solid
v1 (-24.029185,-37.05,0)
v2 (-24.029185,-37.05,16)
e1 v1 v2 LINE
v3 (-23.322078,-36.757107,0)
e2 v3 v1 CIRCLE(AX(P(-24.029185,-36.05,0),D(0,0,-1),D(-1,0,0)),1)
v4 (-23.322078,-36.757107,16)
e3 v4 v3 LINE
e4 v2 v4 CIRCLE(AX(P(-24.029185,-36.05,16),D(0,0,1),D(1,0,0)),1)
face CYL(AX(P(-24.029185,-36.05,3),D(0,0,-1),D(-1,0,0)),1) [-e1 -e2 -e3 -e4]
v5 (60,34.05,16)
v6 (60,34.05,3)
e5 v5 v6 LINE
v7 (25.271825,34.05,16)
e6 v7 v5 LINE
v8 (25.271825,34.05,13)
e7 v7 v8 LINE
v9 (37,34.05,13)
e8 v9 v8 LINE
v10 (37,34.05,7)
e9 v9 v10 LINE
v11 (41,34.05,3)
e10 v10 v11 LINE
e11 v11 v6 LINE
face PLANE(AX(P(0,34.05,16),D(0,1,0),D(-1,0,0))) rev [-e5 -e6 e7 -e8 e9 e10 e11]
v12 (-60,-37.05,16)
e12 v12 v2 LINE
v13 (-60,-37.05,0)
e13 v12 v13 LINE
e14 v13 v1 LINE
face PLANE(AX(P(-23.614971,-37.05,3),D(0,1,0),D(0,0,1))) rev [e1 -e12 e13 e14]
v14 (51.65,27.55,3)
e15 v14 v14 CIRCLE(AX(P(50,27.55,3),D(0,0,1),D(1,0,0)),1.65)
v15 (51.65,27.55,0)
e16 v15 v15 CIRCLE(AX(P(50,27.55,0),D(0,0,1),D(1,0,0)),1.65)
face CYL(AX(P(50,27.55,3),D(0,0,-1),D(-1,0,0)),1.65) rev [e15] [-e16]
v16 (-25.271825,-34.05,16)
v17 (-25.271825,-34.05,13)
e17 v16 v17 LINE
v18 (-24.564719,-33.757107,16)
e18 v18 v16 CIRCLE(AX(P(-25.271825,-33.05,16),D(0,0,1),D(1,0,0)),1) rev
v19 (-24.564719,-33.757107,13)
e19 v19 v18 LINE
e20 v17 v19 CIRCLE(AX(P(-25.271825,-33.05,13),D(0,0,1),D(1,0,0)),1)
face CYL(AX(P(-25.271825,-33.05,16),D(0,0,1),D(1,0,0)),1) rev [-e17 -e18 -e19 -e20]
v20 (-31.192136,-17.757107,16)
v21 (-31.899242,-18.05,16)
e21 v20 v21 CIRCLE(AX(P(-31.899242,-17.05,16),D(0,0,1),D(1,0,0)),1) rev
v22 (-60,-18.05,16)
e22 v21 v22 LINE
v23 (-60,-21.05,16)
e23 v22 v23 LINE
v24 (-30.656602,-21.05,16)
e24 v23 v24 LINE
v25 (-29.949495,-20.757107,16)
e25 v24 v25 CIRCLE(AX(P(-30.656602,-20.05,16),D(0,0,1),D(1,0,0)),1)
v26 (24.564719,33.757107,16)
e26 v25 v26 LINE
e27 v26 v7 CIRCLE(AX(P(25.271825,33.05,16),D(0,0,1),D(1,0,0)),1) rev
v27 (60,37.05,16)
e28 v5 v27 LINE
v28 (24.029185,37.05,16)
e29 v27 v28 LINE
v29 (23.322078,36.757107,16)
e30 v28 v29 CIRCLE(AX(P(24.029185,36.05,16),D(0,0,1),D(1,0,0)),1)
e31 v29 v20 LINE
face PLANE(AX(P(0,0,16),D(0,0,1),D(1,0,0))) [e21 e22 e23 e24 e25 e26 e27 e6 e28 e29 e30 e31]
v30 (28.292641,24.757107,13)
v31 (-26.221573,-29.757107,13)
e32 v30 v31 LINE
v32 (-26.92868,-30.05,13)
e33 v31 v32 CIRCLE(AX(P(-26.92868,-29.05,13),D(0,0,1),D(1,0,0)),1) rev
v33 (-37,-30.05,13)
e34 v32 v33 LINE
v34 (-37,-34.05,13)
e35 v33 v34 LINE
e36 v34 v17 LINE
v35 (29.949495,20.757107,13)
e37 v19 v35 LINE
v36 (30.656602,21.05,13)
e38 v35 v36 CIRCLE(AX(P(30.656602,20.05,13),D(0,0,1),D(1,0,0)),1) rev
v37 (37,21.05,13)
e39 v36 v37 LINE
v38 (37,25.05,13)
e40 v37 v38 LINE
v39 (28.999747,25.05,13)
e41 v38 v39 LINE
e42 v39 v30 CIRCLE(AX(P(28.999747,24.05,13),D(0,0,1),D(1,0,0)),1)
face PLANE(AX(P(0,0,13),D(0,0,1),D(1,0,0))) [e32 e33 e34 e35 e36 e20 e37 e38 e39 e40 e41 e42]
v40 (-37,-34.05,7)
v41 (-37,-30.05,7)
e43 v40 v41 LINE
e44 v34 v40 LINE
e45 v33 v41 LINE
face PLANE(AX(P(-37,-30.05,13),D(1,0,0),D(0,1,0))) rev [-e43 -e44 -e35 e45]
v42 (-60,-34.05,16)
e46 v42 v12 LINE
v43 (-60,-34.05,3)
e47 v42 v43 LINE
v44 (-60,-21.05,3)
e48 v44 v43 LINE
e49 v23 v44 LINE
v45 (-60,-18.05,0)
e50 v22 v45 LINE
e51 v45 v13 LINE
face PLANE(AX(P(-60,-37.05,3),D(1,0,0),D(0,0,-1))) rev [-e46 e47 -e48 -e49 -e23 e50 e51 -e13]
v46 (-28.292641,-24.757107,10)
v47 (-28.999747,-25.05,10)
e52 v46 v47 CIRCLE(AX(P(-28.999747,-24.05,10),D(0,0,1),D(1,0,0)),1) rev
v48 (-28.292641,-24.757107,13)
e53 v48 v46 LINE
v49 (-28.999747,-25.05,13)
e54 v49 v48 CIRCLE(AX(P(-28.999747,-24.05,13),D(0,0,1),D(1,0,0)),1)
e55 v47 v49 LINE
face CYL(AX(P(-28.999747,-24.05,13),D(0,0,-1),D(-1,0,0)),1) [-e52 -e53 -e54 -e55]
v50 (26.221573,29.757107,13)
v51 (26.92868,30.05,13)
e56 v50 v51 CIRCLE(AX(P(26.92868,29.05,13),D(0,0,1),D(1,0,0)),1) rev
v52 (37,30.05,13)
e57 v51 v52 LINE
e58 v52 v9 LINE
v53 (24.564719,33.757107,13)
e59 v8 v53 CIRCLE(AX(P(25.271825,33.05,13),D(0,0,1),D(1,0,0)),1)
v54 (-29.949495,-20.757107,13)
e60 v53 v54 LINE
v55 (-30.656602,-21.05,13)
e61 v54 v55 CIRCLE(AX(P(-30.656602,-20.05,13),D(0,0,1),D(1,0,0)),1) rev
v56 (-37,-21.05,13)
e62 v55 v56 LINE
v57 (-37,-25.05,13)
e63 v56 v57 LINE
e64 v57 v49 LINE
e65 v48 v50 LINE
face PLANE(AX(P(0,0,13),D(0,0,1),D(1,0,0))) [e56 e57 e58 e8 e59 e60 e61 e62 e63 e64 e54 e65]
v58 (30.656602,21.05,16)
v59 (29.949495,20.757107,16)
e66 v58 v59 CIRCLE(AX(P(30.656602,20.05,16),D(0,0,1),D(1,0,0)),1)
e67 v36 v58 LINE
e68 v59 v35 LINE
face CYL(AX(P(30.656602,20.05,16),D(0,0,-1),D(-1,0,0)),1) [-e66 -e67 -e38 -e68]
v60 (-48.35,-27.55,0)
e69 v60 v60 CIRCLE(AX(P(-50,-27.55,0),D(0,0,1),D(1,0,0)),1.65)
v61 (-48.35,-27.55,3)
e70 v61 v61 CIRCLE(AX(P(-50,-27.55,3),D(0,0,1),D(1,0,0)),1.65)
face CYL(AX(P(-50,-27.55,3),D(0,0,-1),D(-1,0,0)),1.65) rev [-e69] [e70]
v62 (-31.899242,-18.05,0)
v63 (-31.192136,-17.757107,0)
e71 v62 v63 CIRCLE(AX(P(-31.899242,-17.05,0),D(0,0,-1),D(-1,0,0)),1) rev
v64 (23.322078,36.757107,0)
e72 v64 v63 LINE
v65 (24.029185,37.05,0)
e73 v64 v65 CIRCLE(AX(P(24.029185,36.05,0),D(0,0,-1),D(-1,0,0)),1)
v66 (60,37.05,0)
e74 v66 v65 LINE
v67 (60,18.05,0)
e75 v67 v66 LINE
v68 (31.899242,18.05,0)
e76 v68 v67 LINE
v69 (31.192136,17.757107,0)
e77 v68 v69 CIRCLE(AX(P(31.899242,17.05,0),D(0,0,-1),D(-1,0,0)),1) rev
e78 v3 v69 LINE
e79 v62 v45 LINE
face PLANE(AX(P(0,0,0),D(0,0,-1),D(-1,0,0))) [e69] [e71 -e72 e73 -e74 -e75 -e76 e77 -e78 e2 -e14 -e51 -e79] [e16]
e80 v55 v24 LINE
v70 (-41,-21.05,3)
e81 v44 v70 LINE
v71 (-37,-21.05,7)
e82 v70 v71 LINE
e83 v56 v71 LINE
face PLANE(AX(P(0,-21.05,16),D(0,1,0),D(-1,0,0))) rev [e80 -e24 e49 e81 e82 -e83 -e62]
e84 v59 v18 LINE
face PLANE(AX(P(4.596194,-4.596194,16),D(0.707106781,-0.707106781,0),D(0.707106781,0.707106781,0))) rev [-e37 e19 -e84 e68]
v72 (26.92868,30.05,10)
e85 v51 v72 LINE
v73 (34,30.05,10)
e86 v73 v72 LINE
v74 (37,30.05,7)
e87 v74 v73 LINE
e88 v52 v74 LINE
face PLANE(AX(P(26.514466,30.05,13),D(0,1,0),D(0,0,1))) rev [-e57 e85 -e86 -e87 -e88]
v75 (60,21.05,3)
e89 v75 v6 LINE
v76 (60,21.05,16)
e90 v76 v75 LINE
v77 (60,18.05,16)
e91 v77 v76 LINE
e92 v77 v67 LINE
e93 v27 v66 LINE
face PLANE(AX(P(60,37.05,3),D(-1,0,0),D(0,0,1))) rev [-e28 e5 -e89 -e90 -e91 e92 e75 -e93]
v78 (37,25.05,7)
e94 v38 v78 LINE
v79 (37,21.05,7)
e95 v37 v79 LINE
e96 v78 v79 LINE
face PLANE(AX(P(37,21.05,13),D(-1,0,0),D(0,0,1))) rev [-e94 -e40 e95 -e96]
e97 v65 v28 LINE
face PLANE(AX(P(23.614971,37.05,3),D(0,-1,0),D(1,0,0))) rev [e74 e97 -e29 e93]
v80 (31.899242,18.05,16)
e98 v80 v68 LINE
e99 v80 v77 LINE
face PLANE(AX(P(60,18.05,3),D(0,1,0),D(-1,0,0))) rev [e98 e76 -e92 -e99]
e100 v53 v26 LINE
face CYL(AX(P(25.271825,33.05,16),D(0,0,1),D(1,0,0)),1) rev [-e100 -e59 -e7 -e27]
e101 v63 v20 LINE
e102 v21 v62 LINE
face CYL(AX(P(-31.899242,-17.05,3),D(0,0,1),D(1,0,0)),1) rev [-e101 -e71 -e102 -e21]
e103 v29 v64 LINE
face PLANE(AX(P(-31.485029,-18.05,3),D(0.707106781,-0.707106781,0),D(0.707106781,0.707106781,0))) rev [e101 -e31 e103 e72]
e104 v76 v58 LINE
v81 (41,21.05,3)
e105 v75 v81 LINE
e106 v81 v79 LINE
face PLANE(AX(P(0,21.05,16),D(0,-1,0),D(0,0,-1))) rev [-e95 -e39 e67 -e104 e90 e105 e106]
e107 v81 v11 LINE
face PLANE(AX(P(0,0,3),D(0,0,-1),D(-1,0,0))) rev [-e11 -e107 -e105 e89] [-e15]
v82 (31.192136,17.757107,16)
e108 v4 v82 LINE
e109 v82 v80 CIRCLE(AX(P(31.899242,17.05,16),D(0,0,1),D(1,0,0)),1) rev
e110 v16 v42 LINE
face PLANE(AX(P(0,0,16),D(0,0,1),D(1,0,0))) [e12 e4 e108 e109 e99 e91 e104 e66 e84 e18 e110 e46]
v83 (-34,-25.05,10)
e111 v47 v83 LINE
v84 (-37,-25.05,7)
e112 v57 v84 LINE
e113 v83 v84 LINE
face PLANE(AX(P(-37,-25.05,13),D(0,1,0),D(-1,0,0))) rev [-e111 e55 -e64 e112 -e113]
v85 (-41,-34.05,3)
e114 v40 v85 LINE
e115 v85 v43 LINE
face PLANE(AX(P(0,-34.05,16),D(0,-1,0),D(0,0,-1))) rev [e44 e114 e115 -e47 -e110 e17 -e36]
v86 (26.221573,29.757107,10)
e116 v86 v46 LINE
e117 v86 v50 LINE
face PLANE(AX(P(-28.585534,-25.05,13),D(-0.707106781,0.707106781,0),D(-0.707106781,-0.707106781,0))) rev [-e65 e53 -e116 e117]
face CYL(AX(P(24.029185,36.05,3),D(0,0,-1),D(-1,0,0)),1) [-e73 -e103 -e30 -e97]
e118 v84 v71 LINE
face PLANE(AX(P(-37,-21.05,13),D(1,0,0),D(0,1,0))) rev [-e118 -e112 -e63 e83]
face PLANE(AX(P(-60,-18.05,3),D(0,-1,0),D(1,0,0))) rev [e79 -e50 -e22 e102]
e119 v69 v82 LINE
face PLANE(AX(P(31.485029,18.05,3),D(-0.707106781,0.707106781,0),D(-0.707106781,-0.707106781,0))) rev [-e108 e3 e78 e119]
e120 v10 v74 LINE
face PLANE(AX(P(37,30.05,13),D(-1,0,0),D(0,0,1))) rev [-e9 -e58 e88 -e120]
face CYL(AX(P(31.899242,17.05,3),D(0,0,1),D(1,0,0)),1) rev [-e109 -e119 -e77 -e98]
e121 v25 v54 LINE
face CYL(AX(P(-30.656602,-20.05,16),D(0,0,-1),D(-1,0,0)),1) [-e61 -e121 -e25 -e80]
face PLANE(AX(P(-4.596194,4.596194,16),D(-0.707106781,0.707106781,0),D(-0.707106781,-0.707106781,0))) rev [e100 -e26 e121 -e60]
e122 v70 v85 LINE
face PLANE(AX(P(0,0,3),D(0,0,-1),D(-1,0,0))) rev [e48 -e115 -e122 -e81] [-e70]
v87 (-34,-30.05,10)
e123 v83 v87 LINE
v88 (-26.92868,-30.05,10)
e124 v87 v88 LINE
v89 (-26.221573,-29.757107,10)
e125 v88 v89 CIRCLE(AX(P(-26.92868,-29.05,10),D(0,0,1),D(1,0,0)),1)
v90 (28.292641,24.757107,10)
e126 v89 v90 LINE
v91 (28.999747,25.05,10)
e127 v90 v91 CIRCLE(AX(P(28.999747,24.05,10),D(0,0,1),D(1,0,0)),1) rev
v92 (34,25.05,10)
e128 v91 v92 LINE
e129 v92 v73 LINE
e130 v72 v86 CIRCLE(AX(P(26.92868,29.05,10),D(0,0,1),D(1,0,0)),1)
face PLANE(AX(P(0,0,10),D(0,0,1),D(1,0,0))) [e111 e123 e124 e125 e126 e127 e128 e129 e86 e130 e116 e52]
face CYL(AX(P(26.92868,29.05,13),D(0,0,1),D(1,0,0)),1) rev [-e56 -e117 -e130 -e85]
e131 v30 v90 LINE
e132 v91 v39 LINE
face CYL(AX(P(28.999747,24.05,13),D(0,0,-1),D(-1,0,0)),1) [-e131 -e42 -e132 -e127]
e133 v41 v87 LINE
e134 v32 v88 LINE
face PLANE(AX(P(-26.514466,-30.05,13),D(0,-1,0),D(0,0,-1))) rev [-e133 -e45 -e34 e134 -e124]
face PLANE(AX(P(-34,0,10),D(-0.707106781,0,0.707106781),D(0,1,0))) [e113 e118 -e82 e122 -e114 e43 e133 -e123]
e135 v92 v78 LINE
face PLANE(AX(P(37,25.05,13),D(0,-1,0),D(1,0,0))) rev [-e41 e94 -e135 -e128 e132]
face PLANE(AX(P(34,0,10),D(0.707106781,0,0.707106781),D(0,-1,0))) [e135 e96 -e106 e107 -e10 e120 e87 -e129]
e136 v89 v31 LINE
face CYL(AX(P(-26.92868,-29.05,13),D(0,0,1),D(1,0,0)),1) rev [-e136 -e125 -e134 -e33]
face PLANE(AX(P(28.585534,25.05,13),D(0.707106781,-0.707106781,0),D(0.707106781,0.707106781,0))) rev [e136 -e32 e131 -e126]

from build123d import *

# Parameters (mm, degrees)
SKETCH_10_R     = 1.65
EXTRUDE_1_DEPTH = 3
EXTRUDE_START   = 3
EXTRUDE_2_DEPTH = 7
EXTRUDE_3_DEPTH = 13
CHAMFER_1_SIZE  = 7
EXTRUDE_5_DEPTH = 10
FILLET_1_R      = 1


with BuildPart() as part:
    # 草图10 → 凸台-拉伸1 (new body)
    with BuildSketch(Plane.XY):
        Polygon((-60, -18.05), (-31.485028843, -18.05), (23.614971157, 37.05), (60, 37.05), (60, 18.05), (31.485028843, 18.05), (-23.614971157, -37.05), (-60, -37.05), align=None)
        with Locations((-50, -27.55)):
            Circle(SKETCH_10_R, mode=Mode.SUBTRACT)
        with Locations((50, 27.55)):
            Circle(SKETCH_10_R, mode=Mode.SUBTRACT)
    extrude(amount=EXTRUDE_1_DEPTH)

    # 草图11 → 凸台-拉伸2 (add)
    with BuildSketch(Plane.XY.offset(EXTRUDE_START)):
        Polygon((-41, -18.05), (-41, -37.05), (-23.614971157, -37.05), (31.485028843, 18.05), (41, 18.05), (41, 37.05), (23.614971157, 37.05), (-31.485028843, -18.05), align=None)
    extrude(amount=EXTRUDE_2_DEPTH)

    # 草图12 → 凸台-拉伸3 (add)
    with BuildSketch(Plane.XY.offset(EXTRUDE_START)):
        Polygon((-60, -18.05), (-31.485028843, -18.05), (23.614971157, 37.05), (60, 37.05), (60, 34.05), (24.857611845, 34.05), (-30.242388155, -21.05), (-60, -21.05), align=None)
        Polygon((-60, -34.05), (-60, -37.05), (-23.614971157, -37.05), (31.485028843, 18.05), (60, 18.05), (60, 21.05), (30.242388155, 21.05), (-24.857611845, -34.05), align=None)
    extrude(amount=EXTRUDE_3_DEPTH)

    # 倒角1
    chamfer_1_edges = [part.edges().sort_by_distance(p)[0] for p in [
        (41, 27.55, 10),
        (-41, -27.55, 10),
    ]]
    chamfer(chamfer_1_edges, length=CHAMFER_1_SIZE - 0.0001)  # a hair under: the kernel refuses the full size

    # 草图15 → 凸台-拉伸5 (add)
    with BuildSketch(Plane.XY.offset(3)):
        Polygon((-37, -21.05), (-37, -25.05), (-28.585533906, -25.05), (26.514466094, 30.05), (37, 30.05), (37, 34.05), (24.857611845, 34.05), (-30.242388155, -21.05), align=None)
        Polygon((-37, -30.05), (-37, -34.05), (-24.857611845, -34.05), (30.242388155, 21.05), (37, 21.05), (37, 25.05), (28.585533906, 25.05), (-26.514466094, -30.05), align=None)
    extrude(amount=EXTRUDE_5_DEPTH)

    # 圆角1
    fillet_1_edges = [part.edges().sort_by_distance(p)[0] for p in [
        (-31.485028843, -18.05, 8),
        (23.614971157, 37.05, 8),
        (31.485028843, 18.05, 8),
        (-23.614971157, -37.05, 8),
        (-28.585533906, -25.05, 11.5),
        (26.514466094, 30.05, 11.5),
        (-26.514466094, -30.05, 11.5),
        (28.585533906, 25.05, 11.5),
        (24.857611845, 34.05, 14.5),
        (-30.242388155, -21.05, 14.5),
        (-24.857611845, -34.05, 14.5),
        (30.242388155, 21.05, 14.5),
    ]]
    fillet(fillet_1_edges, radius=FILLET_1_R)


solid = part.part
